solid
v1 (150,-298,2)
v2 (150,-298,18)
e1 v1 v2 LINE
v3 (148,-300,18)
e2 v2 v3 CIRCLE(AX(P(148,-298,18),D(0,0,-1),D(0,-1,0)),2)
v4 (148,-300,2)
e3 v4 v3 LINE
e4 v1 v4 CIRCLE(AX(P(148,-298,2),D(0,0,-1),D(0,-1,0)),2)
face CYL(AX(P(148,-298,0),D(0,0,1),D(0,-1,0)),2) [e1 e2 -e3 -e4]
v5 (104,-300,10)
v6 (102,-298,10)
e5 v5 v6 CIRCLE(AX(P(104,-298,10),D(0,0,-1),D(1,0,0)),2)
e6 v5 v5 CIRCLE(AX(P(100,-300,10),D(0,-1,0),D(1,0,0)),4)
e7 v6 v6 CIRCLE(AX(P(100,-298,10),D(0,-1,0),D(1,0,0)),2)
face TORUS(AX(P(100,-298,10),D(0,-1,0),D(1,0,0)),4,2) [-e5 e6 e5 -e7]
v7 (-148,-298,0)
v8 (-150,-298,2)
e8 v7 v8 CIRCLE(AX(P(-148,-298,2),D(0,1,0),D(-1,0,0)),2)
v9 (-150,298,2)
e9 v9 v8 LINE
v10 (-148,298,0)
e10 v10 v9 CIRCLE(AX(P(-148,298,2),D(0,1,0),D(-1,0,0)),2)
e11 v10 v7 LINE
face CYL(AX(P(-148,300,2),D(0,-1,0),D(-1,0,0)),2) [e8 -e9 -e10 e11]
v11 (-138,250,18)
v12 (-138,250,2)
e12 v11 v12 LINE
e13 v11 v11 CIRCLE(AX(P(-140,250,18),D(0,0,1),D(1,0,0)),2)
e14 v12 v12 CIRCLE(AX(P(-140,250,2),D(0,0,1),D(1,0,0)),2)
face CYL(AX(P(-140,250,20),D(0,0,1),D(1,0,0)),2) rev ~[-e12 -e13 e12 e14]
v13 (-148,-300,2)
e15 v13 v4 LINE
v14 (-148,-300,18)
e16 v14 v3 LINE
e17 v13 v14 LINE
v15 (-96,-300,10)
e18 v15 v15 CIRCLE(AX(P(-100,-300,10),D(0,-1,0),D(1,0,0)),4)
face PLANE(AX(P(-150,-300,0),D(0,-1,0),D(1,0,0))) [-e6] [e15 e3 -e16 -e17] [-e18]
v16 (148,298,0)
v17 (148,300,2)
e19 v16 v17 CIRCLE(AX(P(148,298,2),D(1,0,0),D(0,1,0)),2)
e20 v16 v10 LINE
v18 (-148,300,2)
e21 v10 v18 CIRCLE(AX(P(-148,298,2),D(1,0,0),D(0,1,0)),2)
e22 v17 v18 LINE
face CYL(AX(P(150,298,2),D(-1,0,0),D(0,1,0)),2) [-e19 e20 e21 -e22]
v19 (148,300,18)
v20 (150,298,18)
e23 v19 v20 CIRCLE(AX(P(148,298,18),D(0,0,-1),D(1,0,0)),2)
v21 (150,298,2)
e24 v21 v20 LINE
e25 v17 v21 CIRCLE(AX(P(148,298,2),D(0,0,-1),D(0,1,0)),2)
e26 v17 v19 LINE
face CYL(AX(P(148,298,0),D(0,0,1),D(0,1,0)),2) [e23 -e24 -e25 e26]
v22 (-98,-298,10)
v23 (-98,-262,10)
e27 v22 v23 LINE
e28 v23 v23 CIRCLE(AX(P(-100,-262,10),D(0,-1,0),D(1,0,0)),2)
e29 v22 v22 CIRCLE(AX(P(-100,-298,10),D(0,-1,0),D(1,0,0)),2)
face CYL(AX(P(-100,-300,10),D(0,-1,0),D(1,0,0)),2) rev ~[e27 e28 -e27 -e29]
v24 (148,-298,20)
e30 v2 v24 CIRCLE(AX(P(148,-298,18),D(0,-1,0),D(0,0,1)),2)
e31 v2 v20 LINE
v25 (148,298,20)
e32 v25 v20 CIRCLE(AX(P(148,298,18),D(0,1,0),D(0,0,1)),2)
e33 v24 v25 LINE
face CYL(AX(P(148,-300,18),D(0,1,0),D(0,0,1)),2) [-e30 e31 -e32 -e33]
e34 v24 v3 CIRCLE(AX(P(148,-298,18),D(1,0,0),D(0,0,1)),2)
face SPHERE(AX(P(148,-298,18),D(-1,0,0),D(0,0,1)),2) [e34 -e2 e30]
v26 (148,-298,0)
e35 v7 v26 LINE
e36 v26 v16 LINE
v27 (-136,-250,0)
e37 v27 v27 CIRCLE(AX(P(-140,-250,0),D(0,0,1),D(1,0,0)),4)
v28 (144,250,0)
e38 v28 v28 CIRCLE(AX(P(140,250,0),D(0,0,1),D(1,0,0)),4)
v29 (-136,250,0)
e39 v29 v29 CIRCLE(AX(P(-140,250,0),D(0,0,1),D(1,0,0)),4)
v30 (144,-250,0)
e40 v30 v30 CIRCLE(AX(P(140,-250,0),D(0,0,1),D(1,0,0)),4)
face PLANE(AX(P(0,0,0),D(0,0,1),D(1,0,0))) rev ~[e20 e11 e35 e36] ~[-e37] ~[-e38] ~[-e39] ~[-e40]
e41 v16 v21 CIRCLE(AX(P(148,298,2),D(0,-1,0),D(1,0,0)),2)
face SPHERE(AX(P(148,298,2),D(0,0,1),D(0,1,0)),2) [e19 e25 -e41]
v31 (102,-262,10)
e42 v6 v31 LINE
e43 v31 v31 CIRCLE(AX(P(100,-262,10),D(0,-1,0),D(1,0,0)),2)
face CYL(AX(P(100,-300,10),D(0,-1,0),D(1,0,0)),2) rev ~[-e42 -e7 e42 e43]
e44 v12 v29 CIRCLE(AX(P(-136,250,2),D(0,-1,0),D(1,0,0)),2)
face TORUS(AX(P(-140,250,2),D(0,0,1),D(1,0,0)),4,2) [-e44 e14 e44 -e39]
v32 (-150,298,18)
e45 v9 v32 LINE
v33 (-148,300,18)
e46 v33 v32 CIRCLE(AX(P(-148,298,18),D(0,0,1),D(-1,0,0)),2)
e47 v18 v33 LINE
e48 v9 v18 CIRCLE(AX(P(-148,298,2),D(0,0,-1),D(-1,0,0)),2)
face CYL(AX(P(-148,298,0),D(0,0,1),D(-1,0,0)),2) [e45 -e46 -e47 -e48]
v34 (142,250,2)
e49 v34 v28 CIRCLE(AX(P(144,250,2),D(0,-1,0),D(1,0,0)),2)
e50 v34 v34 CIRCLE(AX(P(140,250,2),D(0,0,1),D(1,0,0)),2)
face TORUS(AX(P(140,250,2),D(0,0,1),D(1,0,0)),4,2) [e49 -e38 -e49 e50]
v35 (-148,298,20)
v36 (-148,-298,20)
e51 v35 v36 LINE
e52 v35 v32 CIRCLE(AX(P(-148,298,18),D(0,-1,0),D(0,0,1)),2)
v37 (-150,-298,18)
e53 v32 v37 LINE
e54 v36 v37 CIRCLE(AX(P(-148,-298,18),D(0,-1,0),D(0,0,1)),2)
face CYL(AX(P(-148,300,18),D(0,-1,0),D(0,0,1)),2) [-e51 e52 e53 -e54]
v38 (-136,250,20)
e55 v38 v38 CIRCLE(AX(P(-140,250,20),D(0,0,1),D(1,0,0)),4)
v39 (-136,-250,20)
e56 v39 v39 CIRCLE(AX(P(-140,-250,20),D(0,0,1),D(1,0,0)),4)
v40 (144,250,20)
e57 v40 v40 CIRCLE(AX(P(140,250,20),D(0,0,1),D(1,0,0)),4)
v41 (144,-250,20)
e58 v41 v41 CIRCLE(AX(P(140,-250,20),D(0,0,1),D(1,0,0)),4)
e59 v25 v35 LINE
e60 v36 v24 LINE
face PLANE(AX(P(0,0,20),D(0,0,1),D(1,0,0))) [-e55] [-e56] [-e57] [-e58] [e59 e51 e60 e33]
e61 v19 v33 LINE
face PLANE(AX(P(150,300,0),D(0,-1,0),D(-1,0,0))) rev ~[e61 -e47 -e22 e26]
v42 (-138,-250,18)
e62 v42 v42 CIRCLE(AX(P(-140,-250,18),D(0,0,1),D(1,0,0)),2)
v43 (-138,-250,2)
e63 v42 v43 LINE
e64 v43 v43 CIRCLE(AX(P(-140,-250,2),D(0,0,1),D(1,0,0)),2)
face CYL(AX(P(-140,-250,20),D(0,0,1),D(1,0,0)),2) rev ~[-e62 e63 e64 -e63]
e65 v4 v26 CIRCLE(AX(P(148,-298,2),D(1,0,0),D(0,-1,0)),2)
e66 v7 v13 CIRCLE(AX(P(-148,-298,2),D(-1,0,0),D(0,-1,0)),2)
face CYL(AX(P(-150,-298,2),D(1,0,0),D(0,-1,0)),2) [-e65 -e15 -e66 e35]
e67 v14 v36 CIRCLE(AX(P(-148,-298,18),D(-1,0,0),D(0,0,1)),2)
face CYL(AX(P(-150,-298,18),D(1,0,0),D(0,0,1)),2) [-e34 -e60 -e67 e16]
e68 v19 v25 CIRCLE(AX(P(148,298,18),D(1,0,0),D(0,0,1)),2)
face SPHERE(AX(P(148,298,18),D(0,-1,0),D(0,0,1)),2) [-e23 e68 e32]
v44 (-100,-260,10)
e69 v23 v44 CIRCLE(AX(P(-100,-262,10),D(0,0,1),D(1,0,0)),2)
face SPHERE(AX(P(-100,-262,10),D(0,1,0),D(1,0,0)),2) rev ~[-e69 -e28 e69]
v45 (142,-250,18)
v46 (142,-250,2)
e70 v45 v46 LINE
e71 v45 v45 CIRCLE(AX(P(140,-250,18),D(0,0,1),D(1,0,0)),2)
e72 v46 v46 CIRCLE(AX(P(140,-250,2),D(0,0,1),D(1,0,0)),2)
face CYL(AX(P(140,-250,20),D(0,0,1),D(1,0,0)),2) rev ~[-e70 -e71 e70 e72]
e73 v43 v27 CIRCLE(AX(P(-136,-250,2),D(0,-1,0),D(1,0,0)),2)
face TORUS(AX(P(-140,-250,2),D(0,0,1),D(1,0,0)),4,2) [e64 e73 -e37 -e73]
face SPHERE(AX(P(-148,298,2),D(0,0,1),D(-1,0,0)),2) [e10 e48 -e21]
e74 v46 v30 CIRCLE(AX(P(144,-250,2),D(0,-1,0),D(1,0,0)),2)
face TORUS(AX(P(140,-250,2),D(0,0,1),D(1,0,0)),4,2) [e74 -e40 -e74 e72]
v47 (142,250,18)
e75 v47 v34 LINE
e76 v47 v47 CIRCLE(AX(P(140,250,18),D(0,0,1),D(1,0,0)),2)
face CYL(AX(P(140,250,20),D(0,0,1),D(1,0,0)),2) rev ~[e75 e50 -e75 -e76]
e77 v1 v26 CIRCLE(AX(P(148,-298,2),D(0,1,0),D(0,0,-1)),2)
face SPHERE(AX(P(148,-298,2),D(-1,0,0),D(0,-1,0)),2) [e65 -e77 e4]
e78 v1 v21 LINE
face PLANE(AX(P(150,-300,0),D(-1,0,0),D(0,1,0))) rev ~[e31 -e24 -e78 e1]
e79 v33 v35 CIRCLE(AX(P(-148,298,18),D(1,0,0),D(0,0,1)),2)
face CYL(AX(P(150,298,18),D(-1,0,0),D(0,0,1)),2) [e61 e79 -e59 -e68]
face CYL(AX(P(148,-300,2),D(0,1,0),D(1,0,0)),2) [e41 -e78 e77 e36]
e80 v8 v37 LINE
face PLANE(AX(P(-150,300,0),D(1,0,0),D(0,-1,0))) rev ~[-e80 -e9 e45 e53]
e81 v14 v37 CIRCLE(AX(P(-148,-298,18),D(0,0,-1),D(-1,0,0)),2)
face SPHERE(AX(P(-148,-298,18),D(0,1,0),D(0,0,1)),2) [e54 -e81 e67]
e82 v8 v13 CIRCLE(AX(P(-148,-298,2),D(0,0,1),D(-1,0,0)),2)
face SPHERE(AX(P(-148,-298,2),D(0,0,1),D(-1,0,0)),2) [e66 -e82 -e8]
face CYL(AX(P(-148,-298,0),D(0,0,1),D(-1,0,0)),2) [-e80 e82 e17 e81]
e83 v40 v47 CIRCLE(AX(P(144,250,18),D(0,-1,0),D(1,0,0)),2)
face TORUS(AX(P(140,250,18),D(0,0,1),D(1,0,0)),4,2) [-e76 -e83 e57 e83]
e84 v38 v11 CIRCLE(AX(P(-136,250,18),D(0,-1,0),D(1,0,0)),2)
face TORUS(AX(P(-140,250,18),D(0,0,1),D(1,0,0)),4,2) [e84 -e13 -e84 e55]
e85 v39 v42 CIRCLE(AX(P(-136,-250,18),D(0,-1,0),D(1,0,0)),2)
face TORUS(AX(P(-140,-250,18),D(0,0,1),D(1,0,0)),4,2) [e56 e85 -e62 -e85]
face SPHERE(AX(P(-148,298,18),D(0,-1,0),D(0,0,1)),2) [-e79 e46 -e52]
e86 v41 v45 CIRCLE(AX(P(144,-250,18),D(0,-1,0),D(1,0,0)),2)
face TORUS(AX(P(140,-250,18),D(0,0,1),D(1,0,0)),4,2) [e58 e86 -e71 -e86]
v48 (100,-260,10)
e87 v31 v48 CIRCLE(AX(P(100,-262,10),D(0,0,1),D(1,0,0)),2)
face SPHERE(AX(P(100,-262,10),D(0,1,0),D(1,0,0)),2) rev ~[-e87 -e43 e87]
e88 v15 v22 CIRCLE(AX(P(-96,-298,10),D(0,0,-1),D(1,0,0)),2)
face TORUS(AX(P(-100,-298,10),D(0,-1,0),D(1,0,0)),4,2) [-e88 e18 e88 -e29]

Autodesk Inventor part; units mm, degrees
ref_plane "YZ Plane" through (0, 0, 0) normal (1, 0, 0) x (0, 1, 0)
ref_plane "XZ Plane" through (0, 0, 0) normal (0, 1, 0) x (-1, 0, 0)
ref_plane "XY Plane" through (0, 0, 0) normal (0, 0, 1) x (1, 0, 0)
sketch "草图1" plane through (0, 0, 0) normal (1, 0, 0) x (0, 1, 0)
  point P0 (0, 0)
sketch "草图2" plane through (0, 0, 0) normal (0, 0, 1) x (1, 0, 0)
  line L0 (-150, -300) -> (150, -300)
  line L1 (150, -300) -> (150, 300)
  line L2 (150, 300) -> (-150, 300)
  line L3 (-150, 300) -> (-150, -300)
  point P0 (0, 0)
  dimension "d0" = 300
  dimension "d1" = 600
extrude "拉伸1" add sketch "草图2" along normal blind 20
sketch "草图3" plane through (0, 0, 20) normal (0, 0, 1) x (1, 0, 0)
  circle A0 centre (-140, 250) radius 2
  point P0 (0, 0)
  dimension "d4" = 4
extrude "拉伸2" cut sketch "草图3" against normal through all
sketch "草图4" plane through (0, 0, 20) normal (0, 0, 1) x (1, 0, 0)
  circle A0 centre (-110, 250) radius 2
  point P0 (0, 0)
  dimension "d7" = 4
extrude "拉伸3" cut sketch "草图4" against normal up to next
sketch "草图5" plane through (0, 0, 20) normal (0, 0, 1) x (1, 0, 0)
  circle A0 centre (140, 250) radius 2
  point P0 (0, 0)
  dimension "d10" = 4
extrude "拉伸4" cut sketch "草图5" against normal up to next
sketch "草图6" plane through (0, 0, 20) normal (0, 0, 1) x (1, 0, 0)
  circle A0 centre (110, 250) radius 2
  point P0 (0, 0)
  dimension "d13" = 4
extrude "拉伸5" cut sketch "草图6" against normal through all
sketch "草图7" plane through (0, 0, 20) normal (0, 0, 1) x (1, 0, 0)
  circle A0 centre (140, -250) radius 2
  point P0 (0, 0)
  dimension "d16" = 4
extrude "拉伸6" cut sketch "草图7" against normal through all
sketch "草图9" plane through (0, 0, 20) normal (0, 0, 1) x (1, 0, 0)
  circle A0 centre (-140, -250) radius 2
  point P0 (0, 0)
  dimension "d22" = 4
extrude "拉伸8" cut sketch "草图9" against normal through all
sketch "草图11" plane through (-150, -300, 0) normal (0, -1, 0) x (1, 0, 0)
  circle A0 centre (25, 10) radius 2
  point P0 (150, 0)
  dimension "d28" = 4
extrude "拉伸10" cut sketch "草图11" against normal blind 20
sketch "草图12" plane through (-150, -300, 0) normal (0, -1, 0) x (1, 0, 0)
  circle A0 centre (275, 10) radius 2
  point P0 (150, 0)
  dimension "d31" = 4
extrude "拉伸11" cut sketch "草图12" against normal blind 20
sketch "草图13" plane through (-150, -300, 0) normal (0, -1, 0) x (1, 0, 0)
  circle A0 centre (275, 10) radius 2 projected
  circle A1 centre (275, 10) radius 2
  point P0 (150, 0)
  dimension "d34" = 4
extrude "拉伸12" cut sketch "草图13" against normal blind 40
sketch "草图14" plane through (-150, -300, 0) normal (0, -1, 0) x (1, 0, 0)
  circle A0 centre (25, 10) radius 2 projected
  circle A1 centre (25, 10) radius 2
  point P0 (150, 0)
  dimension "d37" = 4
extrude "拉伸13" cut sketch "草图14" against normal blind 40
sketch "草图15" plane through (-150, -300, 0) normal (0, -1, 0) x (1, 0, 0)
  circle A0 centre (25, 10) radius 2 projected
  circle A1 centre (25, 10) radius 2
  point P0 (150, 0)
  dimension "d40" = 4
extrude "拉伸14" add sketch "草图15" against normal blind 600
sketch "草图16" plane through (-150, -300, 0) normal (0, -1, 0) x (1, 0, 0)
  circle A0 centre (275, 10) radius 2 projected
  circle A1 centre (275, 10) radius 2
  point P0 (150, 0)
  dimension "d43" = 4
extrude "拉伸15" add sketch "草图16" against normal blind 600
sketch "草图17" plane through (-150, -300, 0) normal (0, -1, 0) x (1, 0, 0)
  circle A0 centre (50, 10) radius 2
  point P0 (150, 0)
  dimension "d46" = 4
extrude "拉伸16" cut sketch "草图17" against normal blind 40
sketch "草图18" plane through (-150, -300, 0) normal (0, -1, 0) x (1, 0, 0)
  circle A0 centre (250, 10) radius 2
  point P0 (150, 0)
  dimension "d49" = 4
extrude "拉伸17" cut sketch "草图18" against normal blind 40
sketch "草图19" plane through (0, 0, 20) normal (0, 0, 1) x (1, 0, 0)
  circle A0 centre (110, 250) radius 3
  point P0 (0, 0)
  dimension "d52" = 6
extrude "拉伸18" cut sketch "草图19" against normal through all
sketch "草图20" plane through (0, 0, 20) normal (0, 0, 1) x (1, 0, 0)
  circle A0 centre (-110, 250) radius 2 projected
  circle A1 centre (-110, 250) radius 3
  point P0 (0, 0)
  dimension "d55" = 6
extrude "拉伸19" cut sketch "草图20" against normal through all
sketch "草图21" plane through (0, 0, 20) normal (0, 0, 1) x (1, 0, 0)
  point P0 (0, 0)
sketch "草图24" plane through (0, 0, 20) normal (0, 0, 1) x (1, 0, 0)
  circle A0 centre (-109.8054, 249.5578) radius 2
  point P0 (0, 0)
  dimension "d64" = 4
extrude "拉伸22" add sketch "草图24" against normal blind 20
sketch "草图25" plane through (-109.8054, 249.5578, 20) normal (0, 0, 1) x (1, 0, 0)
  point P0 (109.8054, -249.5578)
sketch "草图26" plane through (0, 0, 20) normal (0, 0, 1) x (1, 0, 0)
  circle A0 centre (-110, 250) radius 2
  point P0 (0, 0)
  dimension "d67" = 4
extrude "拉伸23" cut sketch "草图26" against normal blind 20
sketch "草图27" plane through (0, 0, 20) normal (0, 0, 1) x (1, 0, 0)
  circle A0 centre (-110, 250) radius 2
  point P0 (0, 0)
  dimension "d70" = 4
extrude "拉伸24" add sketch "草图27" against normal blind 20
sketch "草图28" plane through (0, 0, 20) normal (0, 0, 1) x (1, 0, 0)
  arc A0 (-111.7199, 248.9793) -> (-108.0855, 250.5785) centre (-109.8054, 249.5578) ccw projected
  circle A1 centre (-111.7199, 248.9793) radius 12.6213
  point P0 (0, 0)
extrude "拉伸25" add sketch "草图28" against normal blind 20
sketch "草图29" plane through (0, 0, 20) normal (0, 0, 1) x (1, 0, 0)
  circle A0 centre (110, 250) radius 3 projected
  circle A1 centre (110, 250) radius 2
  point P0 (0, 0)
  dimension "d75" = 4
extrude "拉伸26" add sketch "草图29" against normal blind 20
sketch "草图30" plane through (0, 0, 20) normal (0, 0, 1) x (1, 0, 0)
  circle A0 centre (88.039, 258.3731) radius 35.0217
  point P0 (0, 0)
extrude "拉伸27" add sketch "草图30" against normal blind 20
fillet "圆角1" radius 2 2 edges at (-102, -260, 10) (98, -260, 10)
fillet "圆角1" radius 2 22 edges at (-150, 0, 20) (0, -300, 20) (150, 0, 20) (0, 300, 20) (-142, -250, 20) (138, -250, 20) (-142, 250, 20) (138, 250, 20) (-150, 300, 10) (-150, -300, 10) (-150, 0, 0) (150, 300, 10) (0, 300, 0) (0, -300, 0) (150, -300, 10) (-102, -300, 10) (98, -300, 10) (150, 0, 0) (-142, -250, 0) (138, -250, 0) (-142, 250, 0) (138, 250, 0)
properties part number "垃圾桶正版"
